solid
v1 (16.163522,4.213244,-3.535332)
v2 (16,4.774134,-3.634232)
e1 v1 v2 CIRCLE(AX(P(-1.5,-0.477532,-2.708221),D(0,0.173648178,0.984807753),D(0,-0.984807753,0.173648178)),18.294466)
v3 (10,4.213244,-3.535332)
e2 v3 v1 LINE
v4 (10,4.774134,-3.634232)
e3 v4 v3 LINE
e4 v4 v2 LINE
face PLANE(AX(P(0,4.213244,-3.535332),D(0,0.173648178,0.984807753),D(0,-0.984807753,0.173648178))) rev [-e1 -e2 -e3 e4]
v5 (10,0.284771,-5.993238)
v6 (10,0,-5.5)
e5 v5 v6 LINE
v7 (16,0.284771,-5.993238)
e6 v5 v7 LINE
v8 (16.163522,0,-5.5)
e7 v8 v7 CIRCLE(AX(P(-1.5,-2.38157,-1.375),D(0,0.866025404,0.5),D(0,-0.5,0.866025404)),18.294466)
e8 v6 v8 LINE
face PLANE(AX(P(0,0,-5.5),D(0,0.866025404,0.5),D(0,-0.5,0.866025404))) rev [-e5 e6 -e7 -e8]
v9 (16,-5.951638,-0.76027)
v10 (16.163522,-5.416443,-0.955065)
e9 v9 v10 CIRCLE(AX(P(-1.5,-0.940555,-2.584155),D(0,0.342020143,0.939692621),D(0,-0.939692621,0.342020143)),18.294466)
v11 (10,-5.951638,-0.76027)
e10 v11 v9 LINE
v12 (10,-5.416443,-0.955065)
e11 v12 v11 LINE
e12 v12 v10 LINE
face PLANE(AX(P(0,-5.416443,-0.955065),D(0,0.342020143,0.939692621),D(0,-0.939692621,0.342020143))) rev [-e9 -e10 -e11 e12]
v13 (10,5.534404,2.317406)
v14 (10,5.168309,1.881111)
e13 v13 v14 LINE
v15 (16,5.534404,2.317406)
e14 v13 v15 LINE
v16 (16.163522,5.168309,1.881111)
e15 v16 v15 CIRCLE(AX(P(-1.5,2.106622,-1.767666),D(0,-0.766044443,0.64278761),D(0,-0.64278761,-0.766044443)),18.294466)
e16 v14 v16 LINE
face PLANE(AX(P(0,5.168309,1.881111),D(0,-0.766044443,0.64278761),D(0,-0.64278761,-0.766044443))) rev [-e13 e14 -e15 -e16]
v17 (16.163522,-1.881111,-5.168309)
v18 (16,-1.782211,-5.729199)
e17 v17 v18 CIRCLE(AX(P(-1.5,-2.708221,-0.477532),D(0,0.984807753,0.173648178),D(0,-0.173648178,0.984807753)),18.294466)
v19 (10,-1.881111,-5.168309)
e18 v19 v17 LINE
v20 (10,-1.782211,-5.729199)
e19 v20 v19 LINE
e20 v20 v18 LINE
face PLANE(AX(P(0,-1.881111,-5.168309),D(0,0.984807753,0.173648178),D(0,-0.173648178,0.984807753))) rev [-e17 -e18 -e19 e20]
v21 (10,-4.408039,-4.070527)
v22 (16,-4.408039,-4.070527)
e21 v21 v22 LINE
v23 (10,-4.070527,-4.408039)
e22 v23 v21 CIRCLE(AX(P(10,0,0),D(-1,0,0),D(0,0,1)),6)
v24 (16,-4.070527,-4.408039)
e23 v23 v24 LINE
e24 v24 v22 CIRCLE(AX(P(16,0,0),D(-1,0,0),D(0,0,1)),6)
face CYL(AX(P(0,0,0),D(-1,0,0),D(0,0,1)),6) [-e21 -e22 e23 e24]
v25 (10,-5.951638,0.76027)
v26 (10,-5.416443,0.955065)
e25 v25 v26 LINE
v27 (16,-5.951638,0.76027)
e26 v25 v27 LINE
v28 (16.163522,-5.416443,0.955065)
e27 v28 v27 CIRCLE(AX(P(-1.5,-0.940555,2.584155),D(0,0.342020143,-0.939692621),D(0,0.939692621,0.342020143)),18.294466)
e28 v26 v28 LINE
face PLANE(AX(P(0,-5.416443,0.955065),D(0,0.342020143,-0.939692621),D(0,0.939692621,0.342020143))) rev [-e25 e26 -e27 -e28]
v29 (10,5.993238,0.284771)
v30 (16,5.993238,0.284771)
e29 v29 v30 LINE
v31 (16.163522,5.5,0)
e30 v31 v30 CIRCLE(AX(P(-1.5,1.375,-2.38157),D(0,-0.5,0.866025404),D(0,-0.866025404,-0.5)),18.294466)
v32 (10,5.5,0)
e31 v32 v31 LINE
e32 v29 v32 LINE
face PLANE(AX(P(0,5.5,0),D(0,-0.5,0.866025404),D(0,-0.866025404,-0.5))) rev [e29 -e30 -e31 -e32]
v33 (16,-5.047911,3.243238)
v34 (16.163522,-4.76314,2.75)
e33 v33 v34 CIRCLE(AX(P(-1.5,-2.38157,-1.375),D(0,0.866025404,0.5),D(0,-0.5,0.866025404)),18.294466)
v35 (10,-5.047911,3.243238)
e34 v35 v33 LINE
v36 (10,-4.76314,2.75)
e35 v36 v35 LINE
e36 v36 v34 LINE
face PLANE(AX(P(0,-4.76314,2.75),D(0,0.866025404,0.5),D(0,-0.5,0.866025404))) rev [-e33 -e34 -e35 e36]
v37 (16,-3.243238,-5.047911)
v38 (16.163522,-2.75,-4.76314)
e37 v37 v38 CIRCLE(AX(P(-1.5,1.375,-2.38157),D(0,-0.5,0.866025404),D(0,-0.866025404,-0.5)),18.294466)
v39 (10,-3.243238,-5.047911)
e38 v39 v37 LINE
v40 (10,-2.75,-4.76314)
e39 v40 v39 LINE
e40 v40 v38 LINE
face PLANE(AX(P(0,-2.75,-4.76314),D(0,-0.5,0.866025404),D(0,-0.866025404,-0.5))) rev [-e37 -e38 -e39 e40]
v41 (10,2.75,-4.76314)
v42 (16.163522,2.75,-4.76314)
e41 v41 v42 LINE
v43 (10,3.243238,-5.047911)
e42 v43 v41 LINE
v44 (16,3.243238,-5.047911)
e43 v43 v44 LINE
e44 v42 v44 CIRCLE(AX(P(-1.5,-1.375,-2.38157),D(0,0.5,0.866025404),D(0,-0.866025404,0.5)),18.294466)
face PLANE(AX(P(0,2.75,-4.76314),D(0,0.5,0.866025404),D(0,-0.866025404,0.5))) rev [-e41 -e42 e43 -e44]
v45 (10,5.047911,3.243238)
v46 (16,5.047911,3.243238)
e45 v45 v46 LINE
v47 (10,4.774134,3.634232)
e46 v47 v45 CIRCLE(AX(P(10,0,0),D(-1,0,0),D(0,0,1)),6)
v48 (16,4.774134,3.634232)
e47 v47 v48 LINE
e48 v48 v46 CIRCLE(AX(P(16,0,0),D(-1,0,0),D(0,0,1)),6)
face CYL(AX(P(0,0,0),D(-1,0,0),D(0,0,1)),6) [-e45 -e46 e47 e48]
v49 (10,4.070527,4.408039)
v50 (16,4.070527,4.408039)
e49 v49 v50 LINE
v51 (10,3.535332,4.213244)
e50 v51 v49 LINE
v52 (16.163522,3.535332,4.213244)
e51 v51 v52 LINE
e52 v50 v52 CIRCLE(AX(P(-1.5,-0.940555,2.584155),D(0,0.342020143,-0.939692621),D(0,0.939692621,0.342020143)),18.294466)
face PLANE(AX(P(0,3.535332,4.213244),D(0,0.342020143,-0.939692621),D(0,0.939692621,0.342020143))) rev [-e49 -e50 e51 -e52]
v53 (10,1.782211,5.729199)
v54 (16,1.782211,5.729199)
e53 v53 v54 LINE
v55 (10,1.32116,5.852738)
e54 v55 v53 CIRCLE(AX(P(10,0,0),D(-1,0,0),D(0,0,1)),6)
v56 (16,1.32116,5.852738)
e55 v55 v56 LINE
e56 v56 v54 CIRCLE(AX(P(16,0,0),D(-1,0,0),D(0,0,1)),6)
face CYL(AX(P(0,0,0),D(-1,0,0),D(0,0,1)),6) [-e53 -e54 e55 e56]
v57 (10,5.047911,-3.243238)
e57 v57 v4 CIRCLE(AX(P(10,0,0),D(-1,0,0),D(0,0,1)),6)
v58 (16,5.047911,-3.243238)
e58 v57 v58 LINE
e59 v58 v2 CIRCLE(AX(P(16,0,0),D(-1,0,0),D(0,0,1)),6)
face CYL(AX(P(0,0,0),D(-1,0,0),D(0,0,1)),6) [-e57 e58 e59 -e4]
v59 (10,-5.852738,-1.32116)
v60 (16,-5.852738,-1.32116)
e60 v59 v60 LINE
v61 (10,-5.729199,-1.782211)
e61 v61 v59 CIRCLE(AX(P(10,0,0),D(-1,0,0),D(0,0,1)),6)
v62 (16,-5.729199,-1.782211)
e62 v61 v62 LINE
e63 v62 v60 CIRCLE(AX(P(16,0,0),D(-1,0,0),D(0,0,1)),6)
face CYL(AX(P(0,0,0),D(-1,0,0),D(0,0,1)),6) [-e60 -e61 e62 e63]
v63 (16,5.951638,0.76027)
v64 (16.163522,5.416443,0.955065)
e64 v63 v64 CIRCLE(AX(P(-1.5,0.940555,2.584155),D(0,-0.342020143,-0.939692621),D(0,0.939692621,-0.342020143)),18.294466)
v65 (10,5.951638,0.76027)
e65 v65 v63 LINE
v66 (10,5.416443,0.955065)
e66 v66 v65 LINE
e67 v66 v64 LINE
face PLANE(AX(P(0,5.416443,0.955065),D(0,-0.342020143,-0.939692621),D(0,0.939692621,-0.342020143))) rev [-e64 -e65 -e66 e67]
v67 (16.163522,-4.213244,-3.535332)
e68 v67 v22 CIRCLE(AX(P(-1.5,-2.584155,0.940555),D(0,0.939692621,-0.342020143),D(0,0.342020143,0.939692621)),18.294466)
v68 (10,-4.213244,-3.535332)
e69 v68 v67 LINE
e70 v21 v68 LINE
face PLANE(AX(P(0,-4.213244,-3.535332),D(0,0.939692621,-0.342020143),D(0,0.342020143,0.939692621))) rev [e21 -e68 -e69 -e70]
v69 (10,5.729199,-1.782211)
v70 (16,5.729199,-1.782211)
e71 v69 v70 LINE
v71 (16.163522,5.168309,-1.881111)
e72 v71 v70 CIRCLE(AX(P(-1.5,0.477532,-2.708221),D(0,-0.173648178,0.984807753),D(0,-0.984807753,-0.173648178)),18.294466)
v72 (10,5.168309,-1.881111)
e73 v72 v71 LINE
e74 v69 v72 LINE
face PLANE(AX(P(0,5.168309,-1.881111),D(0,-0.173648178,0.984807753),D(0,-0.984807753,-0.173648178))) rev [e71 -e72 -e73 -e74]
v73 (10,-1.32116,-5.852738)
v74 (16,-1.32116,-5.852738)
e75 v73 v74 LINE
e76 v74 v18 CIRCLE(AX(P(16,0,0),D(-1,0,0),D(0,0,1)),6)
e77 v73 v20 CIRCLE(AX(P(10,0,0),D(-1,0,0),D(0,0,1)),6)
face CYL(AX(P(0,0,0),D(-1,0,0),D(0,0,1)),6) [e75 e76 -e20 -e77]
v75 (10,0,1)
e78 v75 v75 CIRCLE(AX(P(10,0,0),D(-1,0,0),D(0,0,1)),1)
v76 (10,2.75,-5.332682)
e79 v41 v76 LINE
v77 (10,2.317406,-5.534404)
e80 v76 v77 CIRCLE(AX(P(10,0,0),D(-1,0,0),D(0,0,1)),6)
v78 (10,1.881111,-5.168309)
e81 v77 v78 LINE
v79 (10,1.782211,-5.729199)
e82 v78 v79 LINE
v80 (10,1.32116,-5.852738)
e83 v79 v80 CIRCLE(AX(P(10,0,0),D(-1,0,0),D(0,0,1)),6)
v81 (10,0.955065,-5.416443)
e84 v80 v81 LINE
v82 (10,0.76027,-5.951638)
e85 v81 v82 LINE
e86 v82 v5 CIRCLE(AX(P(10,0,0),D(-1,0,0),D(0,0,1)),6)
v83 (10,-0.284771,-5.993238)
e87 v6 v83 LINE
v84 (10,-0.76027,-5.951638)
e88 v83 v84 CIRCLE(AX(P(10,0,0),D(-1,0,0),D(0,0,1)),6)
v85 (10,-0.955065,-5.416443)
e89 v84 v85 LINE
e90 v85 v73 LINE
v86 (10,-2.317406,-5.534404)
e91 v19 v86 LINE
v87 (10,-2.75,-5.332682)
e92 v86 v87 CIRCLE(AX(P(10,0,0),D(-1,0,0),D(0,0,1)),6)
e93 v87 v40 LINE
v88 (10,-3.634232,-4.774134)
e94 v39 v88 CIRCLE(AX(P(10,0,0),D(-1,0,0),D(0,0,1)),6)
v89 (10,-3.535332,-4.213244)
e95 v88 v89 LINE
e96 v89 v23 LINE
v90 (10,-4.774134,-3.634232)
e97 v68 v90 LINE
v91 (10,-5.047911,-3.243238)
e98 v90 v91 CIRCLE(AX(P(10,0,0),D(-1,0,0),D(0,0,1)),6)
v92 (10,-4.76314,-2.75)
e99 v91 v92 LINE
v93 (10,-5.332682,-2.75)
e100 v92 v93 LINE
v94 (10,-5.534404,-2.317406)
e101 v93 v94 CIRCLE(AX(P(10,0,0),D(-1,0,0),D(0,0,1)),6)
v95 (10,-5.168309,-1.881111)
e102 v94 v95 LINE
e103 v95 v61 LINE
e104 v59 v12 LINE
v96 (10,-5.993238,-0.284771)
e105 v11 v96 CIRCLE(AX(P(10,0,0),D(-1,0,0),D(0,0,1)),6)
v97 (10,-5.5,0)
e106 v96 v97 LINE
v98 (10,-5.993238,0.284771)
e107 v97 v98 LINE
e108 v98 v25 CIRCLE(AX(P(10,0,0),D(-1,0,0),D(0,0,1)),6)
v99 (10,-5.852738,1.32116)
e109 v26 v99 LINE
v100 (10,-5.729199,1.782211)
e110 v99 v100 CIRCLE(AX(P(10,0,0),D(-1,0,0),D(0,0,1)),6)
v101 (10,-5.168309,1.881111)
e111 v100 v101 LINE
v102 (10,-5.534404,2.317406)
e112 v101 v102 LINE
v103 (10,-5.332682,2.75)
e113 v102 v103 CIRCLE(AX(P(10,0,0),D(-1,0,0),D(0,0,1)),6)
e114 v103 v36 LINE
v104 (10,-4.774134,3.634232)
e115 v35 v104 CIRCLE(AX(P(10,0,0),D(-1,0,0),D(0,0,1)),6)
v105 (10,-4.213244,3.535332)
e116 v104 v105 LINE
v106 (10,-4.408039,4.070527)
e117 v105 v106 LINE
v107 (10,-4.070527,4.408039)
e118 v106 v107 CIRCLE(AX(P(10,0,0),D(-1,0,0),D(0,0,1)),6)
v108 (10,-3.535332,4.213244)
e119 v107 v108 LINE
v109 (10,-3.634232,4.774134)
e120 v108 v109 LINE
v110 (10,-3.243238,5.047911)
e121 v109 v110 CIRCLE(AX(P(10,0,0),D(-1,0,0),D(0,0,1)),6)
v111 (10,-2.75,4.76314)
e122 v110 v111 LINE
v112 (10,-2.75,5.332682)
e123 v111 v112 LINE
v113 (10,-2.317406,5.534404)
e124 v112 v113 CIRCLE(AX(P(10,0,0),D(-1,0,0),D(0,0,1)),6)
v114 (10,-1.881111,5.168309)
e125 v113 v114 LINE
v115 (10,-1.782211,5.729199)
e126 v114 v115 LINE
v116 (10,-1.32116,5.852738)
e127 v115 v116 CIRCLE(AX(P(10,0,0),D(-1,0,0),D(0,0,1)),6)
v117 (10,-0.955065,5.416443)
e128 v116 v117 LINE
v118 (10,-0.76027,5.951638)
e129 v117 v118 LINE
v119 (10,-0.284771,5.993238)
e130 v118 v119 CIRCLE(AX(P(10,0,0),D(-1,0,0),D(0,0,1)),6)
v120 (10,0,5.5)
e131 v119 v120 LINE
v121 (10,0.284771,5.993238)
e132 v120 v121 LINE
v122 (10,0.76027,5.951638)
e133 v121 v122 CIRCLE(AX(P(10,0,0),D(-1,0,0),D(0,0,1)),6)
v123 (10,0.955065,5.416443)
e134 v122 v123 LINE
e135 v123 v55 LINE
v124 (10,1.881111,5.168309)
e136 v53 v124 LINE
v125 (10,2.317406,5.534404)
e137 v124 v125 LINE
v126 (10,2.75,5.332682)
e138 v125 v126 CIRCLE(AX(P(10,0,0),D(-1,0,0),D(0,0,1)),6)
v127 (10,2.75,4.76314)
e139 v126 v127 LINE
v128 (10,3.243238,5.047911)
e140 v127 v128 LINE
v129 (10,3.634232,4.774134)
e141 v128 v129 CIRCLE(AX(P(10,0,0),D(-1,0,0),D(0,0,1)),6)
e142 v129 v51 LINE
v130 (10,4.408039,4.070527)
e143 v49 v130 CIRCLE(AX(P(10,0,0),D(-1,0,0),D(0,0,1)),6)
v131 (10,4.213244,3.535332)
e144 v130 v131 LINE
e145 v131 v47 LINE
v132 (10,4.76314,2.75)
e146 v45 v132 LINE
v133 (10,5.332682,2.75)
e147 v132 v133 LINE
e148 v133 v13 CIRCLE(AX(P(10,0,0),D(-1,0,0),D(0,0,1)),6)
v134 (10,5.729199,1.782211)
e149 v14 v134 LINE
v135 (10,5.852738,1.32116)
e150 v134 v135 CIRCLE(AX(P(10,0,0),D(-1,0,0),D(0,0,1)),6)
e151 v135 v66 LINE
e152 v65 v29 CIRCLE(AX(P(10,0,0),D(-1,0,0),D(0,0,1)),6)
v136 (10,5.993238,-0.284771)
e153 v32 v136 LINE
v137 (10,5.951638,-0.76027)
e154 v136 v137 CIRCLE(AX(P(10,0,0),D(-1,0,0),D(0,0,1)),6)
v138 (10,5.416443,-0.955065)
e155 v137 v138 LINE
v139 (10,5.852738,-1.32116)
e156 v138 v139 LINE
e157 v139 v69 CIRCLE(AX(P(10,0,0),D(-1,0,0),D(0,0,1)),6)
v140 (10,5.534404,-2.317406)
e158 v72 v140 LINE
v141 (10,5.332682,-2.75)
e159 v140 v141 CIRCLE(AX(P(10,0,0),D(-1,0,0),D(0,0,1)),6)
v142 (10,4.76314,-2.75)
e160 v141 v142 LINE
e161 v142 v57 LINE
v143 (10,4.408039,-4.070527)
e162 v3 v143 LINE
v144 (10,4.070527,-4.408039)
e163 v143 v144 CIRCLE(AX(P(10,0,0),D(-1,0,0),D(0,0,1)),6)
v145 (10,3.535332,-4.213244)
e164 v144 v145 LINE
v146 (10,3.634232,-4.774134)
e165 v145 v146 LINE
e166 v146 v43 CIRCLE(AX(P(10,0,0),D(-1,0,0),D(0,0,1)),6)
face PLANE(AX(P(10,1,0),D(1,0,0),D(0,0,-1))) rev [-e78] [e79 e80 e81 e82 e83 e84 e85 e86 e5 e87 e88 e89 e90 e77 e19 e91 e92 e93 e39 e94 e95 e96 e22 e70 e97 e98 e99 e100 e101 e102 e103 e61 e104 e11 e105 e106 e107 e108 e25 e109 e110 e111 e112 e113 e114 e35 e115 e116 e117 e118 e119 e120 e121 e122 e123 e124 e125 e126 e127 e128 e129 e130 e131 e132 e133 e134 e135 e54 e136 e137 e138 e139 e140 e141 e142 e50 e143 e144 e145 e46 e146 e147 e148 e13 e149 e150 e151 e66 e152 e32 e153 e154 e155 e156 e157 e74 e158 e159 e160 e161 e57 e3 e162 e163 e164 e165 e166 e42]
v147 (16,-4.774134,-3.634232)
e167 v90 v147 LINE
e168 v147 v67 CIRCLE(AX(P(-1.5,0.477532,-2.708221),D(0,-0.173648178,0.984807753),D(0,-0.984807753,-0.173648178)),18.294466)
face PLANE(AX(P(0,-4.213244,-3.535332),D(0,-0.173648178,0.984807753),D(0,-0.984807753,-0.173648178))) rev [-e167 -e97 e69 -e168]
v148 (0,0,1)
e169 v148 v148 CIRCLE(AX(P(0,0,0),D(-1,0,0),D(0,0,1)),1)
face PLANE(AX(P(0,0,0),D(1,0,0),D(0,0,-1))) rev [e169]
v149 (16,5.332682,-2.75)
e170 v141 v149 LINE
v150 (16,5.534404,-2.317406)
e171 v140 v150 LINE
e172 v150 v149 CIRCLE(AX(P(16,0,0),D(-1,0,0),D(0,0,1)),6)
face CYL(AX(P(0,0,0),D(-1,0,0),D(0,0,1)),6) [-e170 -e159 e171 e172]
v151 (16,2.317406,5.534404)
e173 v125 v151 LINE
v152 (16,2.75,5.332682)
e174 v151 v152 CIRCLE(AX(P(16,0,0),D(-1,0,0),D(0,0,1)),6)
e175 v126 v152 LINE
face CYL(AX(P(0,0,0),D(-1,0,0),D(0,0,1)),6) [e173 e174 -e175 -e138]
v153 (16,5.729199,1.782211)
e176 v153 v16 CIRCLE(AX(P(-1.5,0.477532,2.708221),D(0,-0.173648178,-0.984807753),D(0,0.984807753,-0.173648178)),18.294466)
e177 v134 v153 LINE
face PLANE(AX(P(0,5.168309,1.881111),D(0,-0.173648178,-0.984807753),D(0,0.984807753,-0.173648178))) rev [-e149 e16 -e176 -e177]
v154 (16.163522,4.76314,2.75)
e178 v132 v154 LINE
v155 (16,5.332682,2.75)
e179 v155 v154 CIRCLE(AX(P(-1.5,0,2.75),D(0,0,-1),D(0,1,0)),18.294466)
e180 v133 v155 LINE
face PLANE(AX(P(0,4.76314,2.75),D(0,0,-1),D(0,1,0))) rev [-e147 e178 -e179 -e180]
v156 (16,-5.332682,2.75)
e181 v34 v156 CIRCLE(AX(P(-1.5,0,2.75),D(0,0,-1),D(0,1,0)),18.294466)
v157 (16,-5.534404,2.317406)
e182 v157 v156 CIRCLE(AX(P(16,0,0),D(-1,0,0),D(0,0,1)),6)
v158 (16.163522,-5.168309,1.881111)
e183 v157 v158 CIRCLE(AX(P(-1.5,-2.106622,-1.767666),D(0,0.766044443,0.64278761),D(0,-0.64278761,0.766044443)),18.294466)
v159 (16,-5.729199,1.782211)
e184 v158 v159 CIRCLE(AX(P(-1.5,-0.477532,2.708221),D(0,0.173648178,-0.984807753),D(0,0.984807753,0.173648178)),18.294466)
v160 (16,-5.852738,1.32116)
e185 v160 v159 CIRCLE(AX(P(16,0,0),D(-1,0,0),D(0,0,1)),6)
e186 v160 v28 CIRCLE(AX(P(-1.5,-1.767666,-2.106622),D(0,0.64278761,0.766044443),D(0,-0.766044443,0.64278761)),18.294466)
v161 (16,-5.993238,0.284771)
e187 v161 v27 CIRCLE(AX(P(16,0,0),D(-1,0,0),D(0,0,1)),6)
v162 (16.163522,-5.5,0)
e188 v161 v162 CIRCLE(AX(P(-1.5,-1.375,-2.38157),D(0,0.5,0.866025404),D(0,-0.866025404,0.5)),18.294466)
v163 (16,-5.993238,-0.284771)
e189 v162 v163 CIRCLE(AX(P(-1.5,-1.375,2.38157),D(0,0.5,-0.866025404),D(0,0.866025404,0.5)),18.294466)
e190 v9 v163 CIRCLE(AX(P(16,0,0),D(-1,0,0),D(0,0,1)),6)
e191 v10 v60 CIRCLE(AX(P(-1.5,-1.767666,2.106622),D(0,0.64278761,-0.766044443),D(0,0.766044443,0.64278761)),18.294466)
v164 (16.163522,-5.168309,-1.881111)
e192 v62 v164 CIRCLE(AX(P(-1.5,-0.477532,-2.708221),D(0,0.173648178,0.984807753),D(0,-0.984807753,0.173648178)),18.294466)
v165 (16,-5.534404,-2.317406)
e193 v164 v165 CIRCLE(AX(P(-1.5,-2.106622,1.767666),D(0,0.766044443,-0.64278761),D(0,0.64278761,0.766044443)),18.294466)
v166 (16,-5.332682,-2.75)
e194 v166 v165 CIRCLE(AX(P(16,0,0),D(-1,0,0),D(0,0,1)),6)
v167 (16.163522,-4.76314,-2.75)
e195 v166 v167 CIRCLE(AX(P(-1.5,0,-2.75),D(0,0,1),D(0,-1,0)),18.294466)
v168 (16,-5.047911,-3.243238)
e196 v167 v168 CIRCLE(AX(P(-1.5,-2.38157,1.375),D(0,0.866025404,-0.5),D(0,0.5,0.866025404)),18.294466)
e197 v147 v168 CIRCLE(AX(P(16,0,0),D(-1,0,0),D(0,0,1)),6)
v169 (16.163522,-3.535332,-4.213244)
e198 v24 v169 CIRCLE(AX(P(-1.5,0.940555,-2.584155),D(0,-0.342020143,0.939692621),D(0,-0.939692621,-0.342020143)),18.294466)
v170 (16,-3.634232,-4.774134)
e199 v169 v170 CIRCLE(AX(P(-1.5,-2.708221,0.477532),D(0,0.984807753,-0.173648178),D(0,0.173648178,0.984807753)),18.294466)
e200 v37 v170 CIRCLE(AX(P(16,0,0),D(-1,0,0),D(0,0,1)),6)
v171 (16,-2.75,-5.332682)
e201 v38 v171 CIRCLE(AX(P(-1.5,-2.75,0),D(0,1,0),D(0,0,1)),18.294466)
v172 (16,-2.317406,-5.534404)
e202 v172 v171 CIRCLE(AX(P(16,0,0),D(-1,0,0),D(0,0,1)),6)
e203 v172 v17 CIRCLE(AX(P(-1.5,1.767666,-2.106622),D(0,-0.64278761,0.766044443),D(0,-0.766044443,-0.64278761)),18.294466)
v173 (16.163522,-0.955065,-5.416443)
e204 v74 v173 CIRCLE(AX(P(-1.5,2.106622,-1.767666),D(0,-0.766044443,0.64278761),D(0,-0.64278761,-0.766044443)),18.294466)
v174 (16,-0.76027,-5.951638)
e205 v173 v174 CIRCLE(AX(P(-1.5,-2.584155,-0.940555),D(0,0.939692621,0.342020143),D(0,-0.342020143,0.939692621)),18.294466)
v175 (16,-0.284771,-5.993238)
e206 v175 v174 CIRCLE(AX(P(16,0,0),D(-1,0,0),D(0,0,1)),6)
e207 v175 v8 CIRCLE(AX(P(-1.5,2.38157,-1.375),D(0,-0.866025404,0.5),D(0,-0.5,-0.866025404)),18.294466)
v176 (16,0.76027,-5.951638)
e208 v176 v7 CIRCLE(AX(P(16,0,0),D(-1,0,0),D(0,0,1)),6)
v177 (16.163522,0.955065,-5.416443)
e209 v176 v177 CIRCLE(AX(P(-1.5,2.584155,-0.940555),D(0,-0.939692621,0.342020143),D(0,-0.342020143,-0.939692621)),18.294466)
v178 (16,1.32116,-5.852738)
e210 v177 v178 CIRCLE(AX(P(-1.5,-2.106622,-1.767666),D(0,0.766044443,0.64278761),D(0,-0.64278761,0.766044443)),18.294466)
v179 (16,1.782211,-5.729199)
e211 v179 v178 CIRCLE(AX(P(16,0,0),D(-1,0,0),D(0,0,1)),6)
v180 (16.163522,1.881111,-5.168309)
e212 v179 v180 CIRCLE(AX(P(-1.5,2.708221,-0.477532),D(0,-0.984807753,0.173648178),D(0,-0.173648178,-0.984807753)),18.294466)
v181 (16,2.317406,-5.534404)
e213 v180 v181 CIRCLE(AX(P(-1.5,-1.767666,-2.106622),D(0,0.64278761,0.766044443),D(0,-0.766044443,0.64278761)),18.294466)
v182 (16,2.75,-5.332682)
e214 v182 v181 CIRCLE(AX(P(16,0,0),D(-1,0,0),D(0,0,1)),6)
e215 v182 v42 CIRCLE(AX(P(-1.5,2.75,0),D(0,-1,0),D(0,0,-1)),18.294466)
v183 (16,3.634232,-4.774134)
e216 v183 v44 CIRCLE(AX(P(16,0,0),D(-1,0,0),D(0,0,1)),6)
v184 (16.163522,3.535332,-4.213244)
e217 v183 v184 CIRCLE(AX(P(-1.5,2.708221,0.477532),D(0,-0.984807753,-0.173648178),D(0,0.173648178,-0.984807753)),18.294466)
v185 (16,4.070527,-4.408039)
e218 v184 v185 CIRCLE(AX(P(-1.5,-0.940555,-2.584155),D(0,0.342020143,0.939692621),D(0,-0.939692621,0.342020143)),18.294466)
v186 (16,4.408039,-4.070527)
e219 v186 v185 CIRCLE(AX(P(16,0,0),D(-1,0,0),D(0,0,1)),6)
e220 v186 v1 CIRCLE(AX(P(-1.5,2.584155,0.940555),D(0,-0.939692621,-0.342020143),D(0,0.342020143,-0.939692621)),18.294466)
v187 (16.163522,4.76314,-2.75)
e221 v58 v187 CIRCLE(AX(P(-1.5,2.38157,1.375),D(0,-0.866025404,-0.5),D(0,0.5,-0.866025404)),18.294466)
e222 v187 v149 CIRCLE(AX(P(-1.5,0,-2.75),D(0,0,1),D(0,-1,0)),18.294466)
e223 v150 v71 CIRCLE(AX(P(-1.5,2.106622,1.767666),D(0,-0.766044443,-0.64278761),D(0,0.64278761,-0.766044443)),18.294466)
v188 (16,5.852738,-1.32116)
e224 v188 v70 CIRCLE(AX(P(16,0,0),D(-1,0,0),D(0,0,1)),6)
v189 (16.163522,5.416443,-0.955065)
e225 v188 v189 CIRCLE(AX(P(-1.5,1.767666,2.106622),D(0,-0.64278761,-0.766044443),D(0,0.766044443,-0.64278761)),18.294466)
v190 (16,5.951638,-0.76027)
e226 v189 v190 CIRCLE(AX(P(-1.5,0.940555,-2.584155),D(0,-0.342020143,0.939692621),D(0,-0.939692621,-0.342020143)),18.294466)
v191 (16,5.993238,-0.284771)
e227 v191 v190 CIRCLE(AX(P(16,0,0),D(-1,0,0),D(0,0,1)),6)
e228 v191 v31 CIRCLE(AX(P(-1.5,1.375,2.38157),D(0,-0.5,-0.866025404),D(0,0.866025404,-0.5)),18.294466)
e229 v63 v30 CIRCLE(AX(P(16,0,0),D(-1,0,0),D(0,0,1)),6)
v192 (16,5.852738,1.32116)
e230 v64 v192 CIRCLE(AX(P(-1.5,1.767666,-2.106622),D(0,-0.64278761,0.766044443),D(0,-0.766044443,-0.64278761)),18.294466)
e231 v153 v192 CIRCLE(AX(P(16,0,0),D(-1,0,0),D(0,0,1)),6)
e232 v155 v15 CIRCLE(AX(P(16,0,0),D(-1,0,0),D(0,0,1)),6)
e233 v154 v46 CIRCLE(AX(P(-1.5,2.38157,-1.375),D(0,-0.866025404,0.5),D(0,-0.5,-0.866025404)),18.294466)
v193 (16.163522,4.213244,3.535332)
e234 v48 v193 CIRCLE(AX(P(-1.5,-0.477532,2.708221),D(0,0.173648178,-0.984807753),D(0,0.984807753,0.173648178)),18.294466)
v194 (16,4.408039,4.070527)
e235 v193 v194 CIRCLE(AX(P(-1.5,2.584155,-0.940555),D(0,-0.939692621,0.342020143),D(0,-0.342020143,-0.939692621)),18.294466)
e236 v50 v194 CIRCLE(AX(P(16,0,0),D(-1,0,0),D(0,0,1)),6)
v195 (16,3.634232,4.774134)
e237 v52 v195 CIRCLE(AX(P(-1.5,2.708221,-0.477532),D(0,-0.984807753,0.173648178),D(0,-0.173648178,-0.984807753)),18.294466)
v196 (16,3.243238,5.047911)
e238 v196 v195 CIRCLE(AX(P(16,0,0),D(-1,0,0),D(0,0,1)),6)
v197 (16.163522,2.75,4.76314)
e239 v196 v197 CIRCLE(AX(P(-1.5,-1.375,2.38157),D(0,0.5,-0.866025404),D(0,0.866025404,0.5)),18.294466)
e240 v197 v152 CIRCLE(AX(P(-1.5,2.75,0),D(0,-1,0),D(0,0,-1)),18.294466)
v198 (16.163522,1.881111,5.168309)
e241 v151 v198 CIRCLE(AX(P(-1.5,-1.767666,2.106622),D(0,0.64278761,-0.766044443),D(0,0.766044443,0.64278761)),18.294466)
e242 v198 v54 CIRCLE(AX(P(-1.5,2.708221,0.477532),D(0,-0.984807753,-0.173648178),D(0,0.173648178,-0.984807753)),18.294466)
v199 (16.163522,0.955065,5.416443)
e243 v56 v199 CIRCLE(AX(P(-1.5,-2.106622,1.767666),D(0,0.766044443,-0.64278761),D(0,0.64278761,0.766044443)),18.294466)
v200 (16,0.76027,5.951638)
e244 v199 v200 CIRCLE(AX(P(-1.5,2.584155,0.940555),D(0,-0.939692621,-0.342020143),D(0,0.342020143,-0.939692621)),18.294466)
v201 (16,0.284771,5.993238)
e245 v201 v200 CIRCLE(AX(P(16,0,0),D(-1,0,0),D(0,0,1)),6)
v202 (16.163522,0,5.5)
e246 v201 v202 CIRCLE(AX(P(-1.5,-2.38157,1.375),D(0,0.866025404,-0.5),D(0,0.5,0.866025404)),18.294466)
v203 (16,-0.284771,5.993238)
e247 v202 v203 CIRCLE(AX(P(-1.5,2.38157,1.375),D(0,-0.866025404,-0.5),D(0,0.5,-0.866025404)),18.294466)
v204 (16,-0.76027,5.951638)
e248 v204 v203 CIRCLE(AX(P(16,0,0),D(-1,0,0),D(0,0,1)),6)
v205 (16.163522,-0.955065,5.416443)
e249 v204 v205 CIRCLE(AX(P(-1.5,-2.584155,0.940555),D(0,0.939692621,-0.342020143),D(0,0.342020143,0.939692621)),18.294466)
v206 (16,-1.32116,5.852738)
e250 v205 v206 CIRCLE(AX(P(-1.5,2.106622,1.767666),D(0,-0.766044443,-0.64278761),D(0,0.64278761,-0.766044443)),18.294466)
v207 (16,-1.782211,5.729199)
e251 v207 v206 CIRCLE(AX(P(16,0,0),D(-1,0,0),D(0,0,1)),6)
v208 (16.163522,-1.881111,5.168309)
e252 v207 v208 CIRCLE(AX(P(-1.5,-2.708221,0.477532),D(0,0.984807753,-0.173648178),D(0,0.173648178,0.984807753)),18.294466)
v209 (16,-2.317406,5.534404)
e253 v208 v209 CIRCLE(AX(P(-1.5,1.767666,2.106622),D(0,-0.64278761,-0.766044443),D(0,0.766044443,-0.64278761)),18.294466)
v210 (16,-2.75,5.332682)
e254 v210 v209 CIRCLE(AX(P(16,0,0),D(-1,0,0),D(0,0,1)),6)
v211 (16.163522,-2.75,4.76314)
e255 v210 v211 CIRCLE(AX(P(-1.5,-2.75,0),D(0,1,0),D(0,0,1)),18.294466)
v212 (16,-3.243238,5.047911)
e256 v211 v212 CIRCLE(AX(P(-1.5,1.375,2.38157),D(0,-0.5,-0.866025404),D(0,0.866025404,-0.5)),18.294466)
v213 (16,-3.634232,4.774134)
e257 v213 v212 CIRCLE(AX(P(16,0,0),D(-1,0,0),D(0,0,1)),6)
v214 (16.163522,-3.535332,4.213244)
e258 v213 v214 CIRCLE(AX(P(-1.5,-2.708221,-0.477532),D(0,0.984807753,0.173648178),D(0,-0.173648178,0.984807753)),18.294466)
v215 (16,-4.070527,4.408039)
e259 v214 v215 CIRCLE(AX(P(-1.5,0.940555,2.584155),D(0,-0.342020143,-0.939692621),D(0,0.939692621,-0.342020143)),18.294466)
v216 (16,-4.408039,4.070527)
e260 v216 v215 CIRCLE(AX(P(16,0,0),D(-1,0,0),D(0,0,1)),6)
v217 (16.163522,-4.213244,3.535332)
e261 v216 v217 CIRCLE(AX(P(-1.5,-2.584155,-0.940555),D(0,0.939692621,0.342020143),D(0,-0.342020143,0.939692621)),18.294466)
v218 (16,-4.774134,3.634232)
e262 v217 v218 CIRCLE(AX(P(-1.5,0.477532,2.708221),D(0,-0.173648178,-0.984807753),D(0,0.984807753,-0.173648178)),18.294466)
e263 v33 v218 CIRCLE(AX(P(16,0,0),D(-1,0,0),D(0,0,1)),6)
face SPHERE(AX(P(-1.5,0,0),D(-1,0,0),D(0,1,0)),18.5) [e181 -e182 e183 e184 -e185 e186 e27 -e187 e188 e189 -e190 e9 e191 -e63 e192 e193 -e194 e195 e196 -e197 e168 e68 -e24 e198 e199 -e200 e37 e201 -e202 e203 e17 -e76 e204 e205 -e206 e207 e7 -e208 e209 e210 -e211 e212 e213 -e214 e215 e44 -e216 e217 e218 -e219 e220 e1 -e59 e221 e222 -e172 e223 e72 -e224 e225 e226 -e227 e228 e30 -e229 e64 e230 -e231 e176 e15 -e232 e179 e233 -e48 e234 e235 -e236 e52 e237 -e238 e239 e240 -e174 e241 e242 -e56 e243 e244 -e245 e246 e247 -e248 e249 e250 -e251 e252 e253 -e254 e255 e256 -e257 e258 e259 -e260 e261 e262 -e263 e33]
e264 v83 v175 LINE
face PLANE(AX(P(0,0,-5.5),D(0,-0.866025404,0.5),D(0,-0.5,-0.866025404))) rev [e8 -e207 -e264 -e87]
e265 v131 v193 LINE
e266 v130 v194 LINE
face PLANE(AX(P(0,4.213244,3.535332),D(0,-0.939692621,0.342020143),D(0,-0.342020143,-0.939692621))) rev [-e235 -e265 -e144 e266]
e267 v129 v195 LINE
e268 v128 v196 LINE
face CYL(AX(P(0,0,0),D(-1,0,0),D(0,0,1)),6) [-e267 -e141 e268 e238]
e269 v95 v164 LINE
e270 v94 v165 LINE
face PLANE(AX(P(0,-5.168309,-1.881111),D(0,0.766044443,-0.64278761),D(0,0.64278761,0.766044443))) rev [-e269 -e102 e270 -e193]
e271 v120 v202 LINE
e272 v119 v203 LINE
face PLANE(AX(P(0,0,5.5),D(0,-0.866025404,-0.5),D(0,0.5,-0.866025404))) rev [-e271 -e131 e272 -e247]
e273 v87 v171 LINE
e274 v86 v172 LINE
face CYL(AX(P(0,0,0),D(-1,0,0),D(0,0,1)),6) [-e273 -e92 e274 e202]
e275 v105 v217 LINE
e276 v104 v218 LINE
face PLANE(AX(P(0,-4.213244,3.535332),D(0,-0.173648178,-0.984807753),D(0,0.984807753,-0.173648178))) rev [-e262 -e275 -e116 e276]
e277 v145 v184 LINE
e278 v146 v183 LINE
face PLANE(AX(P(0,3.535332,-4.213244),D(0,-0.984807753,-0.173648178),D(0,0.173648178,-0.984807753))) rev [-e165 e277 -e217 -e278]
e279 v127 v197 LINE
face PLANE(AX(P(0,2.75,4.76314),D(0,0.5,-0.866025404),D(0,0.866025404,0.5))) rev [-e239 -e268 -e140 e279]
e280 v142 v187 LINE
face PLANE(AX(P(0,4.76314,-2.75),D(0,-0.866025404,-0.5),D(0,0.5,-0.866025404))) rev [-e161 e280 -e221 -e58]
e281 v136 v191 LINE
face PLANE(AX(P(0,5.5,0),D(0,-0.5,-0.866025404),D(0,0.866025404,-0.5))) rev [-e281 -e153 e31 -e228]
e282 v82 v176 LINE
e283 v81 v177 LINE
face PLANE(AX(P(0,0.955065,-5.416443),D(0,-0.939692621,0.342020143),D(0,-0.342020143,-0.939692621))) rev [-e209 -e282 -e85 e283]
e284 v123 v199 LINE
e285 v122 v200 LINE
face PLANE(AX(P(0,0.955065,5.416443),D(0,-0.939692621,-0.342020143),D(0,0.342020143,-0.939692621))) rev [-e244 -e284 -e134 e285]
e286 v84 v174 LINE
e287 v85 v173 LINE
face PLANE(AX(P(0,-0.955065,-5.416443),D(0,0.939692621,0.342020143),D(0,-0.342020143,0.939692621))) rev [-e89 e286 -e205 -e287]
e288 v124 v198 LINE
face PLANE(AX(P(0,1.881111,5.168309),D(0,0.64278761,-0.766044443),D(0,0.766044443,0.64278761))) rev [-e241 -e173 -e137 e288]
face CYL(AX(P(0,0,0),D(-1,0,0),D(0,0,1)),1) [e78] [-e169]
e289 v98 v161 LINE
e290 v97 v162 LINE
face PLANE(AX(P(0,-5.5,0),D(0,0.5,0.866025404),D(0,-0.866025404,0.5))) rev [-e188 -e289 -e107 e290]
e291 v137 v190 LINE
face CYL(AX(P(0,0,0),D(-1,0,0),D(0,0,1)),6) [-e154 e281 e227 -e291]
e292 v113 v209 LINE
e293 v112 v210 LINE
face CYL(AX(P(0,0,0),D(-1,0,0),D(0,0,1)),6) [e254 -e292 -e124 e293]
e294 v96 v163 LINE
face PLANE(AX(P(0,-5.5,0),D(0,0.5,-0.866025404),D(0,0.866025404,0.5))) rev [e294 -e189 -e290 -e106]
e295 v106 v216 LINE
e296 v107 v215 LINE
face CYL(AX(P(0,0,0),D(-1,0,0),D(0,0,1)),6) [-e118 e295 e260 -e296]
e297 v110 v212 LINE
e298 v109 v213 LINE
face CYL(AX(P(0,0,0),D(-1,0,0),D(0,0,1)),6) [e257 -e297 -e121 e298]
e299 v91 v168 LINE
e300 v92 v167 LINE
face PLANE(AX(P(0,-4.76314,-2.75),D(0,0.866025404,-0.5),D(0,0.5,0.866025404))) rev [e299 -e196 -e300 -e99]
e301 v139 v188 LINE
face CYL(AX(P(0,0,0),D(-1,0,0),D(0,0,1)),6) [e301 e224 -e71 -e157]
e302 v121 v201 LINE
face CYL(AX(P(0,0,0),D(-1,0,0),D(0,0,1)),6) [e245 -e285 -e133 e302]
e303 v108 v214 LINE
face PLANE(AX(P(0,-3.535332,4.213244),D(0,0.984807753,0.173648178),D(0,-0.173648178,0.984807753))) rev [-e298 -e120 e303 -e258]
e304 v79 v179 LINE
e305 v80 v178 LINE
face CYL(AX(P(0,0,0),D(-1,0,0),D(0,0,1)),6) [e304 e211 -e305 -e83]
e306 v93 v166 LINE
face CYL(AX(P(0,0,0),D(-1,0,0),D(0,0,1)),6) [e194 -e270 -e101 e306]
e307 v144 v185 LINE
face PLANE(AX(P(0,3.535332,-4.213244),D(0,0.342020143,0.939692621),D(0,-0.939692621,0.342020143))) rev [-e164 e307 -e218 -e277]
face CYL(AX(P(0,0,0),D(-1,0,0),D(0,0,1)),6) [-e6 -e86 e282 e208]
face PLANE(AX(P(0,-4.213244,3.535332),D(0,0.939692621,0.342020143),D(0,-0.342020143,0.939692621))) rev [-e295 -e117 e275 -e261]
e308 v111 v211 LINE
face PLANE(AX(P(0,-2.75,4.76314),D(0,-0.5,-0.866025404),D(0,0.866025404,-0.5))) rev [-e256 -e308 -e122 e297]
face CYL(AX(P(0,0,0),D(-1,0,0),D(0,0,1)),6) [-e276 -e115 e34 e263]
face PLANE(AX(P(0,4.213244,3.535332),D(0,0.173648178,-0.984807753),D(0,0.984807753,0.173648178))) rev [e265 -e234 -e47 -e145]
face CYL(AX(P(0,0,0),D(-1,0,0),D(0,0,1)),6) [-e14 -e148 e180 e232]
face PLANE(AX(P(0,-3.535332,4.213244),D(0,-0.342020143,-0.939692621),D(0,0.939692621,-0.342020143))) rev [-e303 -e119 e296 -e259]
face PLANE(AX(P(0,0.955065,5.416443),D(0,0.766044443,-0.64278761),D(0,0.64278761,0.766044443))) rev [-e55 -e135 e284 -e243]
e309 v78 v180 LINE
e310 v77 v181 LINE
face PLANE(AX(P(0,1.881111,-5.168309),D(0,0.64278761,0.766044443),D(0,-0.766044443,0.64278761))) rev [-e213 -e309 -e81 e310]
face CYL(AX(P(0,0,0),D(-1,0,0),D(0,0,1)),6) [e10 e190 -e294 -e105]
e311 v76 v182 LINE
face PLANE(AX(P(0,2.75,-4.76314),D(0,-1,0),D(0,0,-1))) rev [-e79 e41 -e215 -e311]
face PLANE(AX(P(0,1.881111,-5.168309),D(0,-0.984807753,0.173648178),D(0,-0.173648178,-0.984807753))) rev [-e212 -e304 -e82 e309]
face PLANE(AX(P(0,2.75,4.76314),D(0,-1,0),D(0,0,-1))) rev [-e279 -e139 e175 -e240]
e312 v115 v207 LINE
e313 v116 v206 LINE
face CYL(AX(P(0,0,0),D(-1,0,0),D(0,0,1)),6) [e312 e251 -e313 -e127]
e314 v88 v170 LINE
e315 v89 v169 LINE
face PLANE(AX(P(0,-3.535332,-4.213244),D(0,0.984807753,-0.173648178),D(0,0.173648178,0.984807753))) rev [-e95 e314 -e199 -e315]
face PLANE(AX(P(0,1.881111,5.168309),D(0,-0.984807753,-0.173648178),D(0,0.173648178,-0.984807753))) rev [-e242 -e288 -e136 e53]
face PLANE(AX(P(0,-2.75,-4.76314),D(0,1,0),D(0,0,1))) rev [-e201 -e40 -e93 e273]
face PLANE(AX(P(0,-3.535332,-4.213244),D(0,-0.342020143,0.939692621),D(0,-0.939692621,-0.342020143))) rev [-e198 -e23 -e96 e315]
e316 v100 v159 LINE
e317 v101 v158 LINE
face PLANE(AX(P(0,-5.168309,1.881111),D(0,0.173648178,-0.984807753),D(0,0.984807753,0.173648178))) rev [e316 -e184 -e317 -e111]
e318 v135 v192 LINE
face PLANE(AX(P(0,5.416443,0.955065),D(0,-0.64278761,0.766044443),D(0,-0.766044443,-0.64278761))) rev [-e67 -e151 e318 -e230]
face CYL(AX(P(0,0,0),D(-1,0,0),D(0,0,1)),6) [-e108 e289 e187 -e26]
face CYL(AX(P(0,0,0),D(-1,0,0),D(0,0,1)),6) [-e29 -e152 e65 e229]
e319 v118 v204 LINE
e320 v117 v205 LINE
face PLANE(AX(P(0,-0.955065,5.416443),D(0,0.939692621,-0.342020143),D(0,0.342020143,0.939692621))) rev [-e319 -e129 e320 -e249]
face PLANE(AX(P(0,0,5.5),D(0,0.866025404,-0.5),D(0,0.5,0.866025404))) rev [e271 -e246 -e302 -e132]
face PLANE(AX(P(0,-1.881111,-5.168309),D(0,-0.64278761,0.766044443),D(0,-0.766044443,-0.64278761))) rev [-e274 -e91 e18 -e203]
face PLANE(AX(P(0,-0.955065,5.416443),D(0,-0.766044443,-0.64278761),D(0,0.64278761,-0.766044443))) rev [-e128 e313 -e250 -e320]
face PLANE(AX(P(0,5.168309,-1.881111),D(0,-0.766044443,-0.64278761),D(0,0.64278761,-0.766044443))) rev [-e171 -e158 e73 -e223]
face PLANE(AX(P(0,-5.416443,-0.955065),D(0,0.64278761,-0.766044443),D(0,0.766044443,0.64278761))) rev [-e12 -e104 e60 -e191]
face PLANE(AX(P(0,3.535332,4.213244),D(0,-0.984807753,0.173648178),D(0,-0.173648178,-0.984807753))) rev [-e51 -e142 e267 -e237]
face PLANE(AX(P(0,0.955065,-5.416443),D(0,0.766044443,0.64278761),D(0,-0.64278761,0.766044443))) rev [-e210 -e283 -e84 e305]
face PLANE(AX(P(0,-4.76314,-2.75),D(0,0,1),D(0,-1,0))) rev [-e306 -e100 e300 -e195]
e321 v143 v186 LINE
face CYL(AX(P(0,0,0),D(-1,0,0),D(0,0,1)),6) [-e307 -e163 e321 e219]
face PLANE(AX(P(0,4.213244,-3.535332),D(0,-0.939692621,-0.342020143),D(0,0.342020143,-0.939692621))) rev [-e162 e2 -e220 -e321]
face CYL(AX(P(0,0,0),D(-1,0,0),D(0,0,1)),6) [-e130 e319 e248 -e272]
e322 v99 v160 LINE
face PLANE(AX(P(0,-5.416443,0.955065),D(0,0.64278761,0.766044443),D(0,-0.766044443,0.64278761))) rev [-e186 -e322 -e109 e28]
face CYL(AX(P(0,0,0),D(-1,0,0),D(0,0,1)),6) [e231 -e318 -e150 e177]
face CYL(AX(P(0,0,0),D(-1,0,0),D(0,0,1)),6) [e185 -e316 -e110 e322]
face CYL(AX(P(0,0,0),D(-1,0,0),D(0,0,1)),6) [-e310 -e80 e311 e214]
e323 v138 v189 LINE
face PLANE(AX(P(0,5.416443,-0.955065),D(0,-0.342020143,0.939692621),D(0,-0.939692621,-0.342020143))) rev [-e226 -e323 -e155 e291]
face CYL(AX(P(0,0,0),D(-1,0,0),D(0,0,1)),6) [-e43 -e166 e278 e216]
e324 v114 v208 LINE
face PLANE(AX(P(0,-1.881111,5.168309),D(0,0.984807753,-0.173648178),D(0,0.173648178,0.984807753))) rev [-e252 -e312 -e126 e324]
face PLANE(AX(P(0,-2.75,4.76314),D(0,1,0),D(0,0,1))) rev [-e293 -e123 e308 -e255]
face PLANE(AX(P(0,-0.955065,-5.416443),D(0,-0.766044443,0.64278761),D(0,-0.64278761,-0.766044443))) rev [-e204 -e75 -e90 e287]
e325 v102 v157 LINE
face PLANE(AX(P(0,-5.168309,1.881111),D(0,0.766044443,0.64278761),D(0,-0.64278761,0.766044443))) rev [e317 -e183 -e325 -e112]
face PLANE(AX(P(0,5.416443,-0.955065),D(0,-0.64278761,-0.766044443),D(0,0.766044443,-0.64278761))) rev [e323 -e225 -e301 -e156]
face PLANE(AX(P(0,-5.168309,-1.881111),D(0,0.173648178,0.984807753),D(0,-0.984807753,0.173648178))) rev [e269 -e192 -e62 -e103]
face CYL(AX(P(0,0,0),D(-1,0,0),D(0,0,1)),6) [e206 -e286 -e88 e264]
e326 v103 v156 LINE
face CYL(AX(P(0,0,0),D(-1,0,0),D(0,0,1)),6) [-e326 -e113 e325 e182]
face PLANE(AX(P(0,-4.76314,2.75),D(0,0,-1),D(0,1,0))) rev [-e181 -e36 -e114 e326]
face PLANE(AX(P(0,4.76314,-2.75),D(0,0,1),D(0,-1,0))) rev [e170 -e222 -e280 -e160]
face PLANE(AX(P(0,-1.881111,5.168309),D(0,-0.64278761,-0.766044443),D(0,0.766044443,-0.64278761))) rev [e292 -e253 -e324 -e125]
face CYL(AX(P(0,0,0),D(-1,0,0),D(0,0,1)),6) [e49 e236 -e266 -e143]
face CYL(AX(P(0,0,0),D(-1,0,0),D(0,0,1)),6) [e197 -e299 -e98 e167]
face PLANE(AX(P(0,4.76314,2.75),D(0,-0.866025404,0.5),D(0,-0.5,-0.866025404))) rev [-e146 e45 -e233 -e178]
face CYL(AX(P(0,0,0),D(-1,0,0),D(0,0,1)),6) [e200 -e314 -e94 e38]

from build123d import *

# Parameters (mm, degrees)
CUT_EXTRUDE1_DEPTH = 22.725560982
CIRPATTERN1_START  = 10
CIRPATTERN1_DEPTH  = 6.163521733


# Read off the part's stored shape, not the designer's step: CirPattern1
with BuildPart() as part:
    # Sketch2 → Revolve1 (revolve)
    with BuildSketch(Plane.XY, mode=Mode.PRIVATE) as revolve1_sk:
        with BuildLine():
            Line((0, 0), (0, 1))
            Line((0, 1), (10, 1))
            Line((10, 1), (10, 6))
            Line((10, 6), (16, 6))
            ThreePointArc((16, 6), (16.748287591, 3.041381265), (17, 0))
            Line((17, 0), (0, 0))
        make_face()
    revolve(revolve1_sk.sketch.rotate(Axis((0, 0, 0), (1, 0, 0)), 90), axis=Axis((0, 0, 0), (1, 0, 0)))

    # Sketch3 → Cut-Extrude1 (cut, through all)
    with BuildSketch(Plane(origin=(20, 0, 0), x_dir=(0, 0, -1), z_dir=(1, 0, 0))):
        with BuildLine():
            Line((0, 5.5), (-0.284771266, 5.9932383))
            ThreePointArc((-0.284771266, 5.9932383), (0, 6), (0.284771266, 5.9932383))
            Line((0.284771266, 5.9932383), (0, 5.5))
        make_face()
    extrude(amount=-CUT_EXTRUDE1_DEPTH, mode=Mode.SUBTRACT)

    # CirPattern1 outline → CirPattern1 (cut)
    with BuildSketch(Plane.YZ.offset(CIRPATTERN1_START)):
        with BuildLine():
            ThreePointArc((-2.75, 5.332682252), (-3, 5.196152423), (-3.2432383, 5.047910986))
            Line((-3.2432383, 5.047910986), (-2.75, 4.763139721))
            Line((-2.75, 4.763139721), (-2.75, 5.332682252))
        make_face()
        with BuildLine():
            Line((5.416442642, -0.955064977), (5.852737532, -1.321159859))
            ThreePointArc((5.852737532, -1.321159859), (5.908846518, -1.041889066), (5.951637555, -0.760269959))
            Line((5.951637555, -0.760269959), (5.416442642, -0.955064977))
        make_face()
        with BuildLine():
            Line((5.168309414, -1.881110788), (5.534404296, -2.317405679))
            ThreePointArc((5.534404296, -2.317405679), (5.638155724, -2.05212086), (5.729199314, -1.782210766))
            Line((5.729199314, -1.782210766), (5.168309414, -1.881110788))
        make_face()
        with BuildLine():
            Line((4.763139721, -2.75), (5.047910986, -3.2432383))
            ThreePointArc((5.047910986, -3.2432383), (5.196152422, -3), (5.332682252, -2.75))
            Line((5.332682252, -2.75), (4.763139721, -2.75))
        make_face()
        with BuildLine():
            Line((4.213244437, -3.535331853), (4.408039455, -4.070526767))
            ThreePointArc((4.408039455, -4.070526767), (4.596266658, -3.856725658), (4.774134337, -3.634231876))
            Line((4.774134337, -3.634231876), (4.213244437, -3.535331853))
        make_face()
        with BuildLine():
            Line((3.535331853, -4.213244437), (3.634231876, -4.774134337))
            ThreePointArc((3.634231876, -4.774134337), (3.856725658, -4.596266658), (4.070526767, -4.408039455))
            Line((4.070526767, -4.408039455), (3.535331853, -4.213244437))
        make_face()
        with BuildLine():
            Line((2.75, -4.763139721), (2.75, -5.332682252))
            ThreePointArc((2.75, -5.332682252), (3, -5.196152422), (3.2432383, -5.047910986))
            Line((3.2432383, -5.047910986), (2.75, -4.763139721))
        make_face()
        with BuildLine():
            Line((1.881110788, -5.168309414), (1.782210766, -5.729199314))
            ThreePointArc((1.782210766, -5.729199314), (2.05212086, -5.638155724), (2.317405679, -5.534404296))
            Line((2.317405679, -5.534404296), (1.881110788, -5.168309414))
        make_face()
        with BuildLine():
            Line((0.955064977, -5.416442642), (0.760269959, -5.951637555))
            ThreePointArc((0.760269959, -5.951637555), (1.041889066, -5.908846518), (1.321159859, -5.852737532))
            Line((1.321159859, -5.852737532), (0.955064977, -5.416442642))
        make_face()
        with BuildLine():
            Line((0, -5.5), (-0.284771266, -5.9932383))
            ThreePointArc((-0.284771266, -5.9932383), (0, -6), (0.284771266, -5.9932383))
            Line((0.284771266, -5.9932383), (0, -5.5))
        make_face()
        with BuildLine():
            Line((-0.955064977, -5.416442642), (-1.321159859, -5.852737533))
            ThreePointArc((-1.321159859, -5.852737533), (-1.041889066, -5.908846518), (-0.760269959, -5.951637555))
            Line((-0.760269959, -5.951637555), (-0.955064977, -5.416442642))
        make_face()
        with BuildLine():
            Line((-1.881110788, -5.168309414), (-2.317405679, -5.534404297))
            ThreePointArc((-2.317405679, -5.534404297), (-2.05212086, -5.638155725), (-1.782210766, -5.729199314))
            Line((-1.782210766, -5.729199314), (-1.881110788, -5.168309414))
        make_face()
        with BuildLine():
            Line((-2.75, -4.763139721), (-3.2432383, -5.047910986))
            ThreePointArc((-3.2432383, -5.047910986), (-3, -5.196152423), (-2.75, -5.332682252))
            Line((-2.75, -5.332682252), (-2.75, -4.763139721))
        make_face()
        with BuildLine():
            Line((-3.535331853, -4.213244437), (-4.070526767, -4.408039455))
            ThreePointArc((-4.070526767, -4.408039455), (-3.856725658, -4.596266658), (-3.634231876, -4.774134337))
            Line((-3.634231876, -4.774134337), (-3.535331853, -4.213244437))
        make_face()
        with BuildLine():
            Line((-4.213244437, -3.535331853), (-4.774134337, -3.634231876))
            ThreePointArc((-4.774134337, -3.634231876), (-4.596266658, -3.856725658), (-4.408039455, -4.070526767))
            Line((-4.408039455, -4.070526767), (-4.213244437, -3.535331853))
        make_face()
        with BuildLine():
            Line((-4.763139721, -2.75), (-5.332682252, -2.75))
            ThreePointArc((-5.332682252, -2.75), (-5.196152423, -3), (-5.047910986, -3.2432383))
            Line((-5.047910986, -3.2432383), (-4.763139721, -2.75))
        make_face()
        with BuildLine():
            Line((-5.168309414, -1.881110788), (-5.729199315, -1.782210766))
            ThreePointArc((-5.729199315, -1.782210766), (-5.638155725, -2.05212086), (-5.534404297, -2.317405679))
            Line((-5.534404297, -2.317405679), (-5.168309414, -1.881110788))
        make_face()
        with BuildLine():
            Line((-5.416442642, -0.955064977), (-5.951637555, -0.760269959))
            ThreePointArc((-5.951637555, -0.760269959), (-5.908846518, -1.041889066), (-5.852737533, -1.321159859))
            Line((-5.852737533, -1.321159859), (-5.416442642, -0.955064977))
        make_face()
        with BuildLine():
            Line((-5.5, 0), (-5.9932383, 0.284771266))
            ThreePointArc((-5.9932383, 0.284771266), (-6, 0), (-5.9932383, -0.284771266))
            Line((-5.9932383, -0.284771266), (-5.5, 0))
        make_face()
        with BuildLine():
            Line((-5.416442642, 0.955064977), (-5.852737533, 1.321159859))
            ThreePointArc((-5.852737533, 1.321159859), (-5.908846518, 1.041889066), (-5.951637555, 0.760269959))
            Line((-5.951637555, 0.760269959), (-5.416442642, 0.955064977))
        make_face()
        with BuildLine():
            Line((-5.168309414, 1.881110788), (-5.534404297, 2.317405679))
            ThreePointArc((-5.534404297, 2.317405679), (-5.638155725, 2.05212086), (-5.729199315, 1.782210766))
            Line((-5.729199315, 1.782210766), (-5.168309414, 1.881110788))
        make_face()
        with BuildLine():
            Line((-4.763139721, 2.75), (-5.047910986, 3.2432383))
            ThreePointArc((-5.047910986, 3.2432383), (-5.196152423, 3), (-5.332682252, 2.75))
            Line((-5.332682252, 2.75), (-4.763139721, 2.75))
        make_face()
        with BuildLine():
            Line((-4.213244437, 3.535331853), (-4.408039455, 4.070526767))
            ThreePointArc((-4.408039455, 4.070526767), (-4.596266658, 3.856725658), (-4.774134337, 3.634231876))
            Line((-4.774134337, 3.634231876), (-4.213244437, 3.535331853))
        make_face()
        with BuildLine():
            Line((-3.535331853, 4.213244437), (-3.634231876, 4.774134337))
            ThreePointArc((-3.634231876, 4.774134337), (-3.856725658, 4.596266658), (-4.070526767, 4.408039455))
            Line((-4.070526767, 4.408039455), (-3.535331853, 4.213244437))
        make_face()
        with BuildLine():
            ThreePointArc((5.951637555, 0.760269959), (5.908846518, 1.041889066), (5.852737532, 1.321159859))
            Line((5.852737532, 1.321159859), (5.416442642, 0.955064977))
            Line((5.416442642, 0.955064977), (5.951637555, 0.760269959))
        make_face()
        with BuildLine():
            ThreePointArc((5.729199314, 1.782210766), (5.638155724, 2.05212086), (5.534404296, 2.317405679))
            Line((5.534404296, 2.317405679), (5.168309414, 1.881110788))
            Line((5.168309414, 1.881110788), (5.729199314, 1.782210766))
        make_face()
        with BuildLine():
            ThreePointArc((5.332682252, 2.75), (5.196152422, 3), (5.047910986, 3.2432383))
            Line((5.047910986, 3.2432383), (4.763139721, 2.75))
            Line((4.763139721, 2.75), (5.332682252, 2.75))
        make_face()
        with BuildLine():
            ThreePointArc((4.774134337, 3.634231876), (4.596266658, 3.856725658), (4.408039455, 4.070526767))
            Line((4.408039455, 4.070526767), (4.213244437, 3.535331853))
            Line((4.213244437, 3.535331853), (4.774134337, 3.634231876))
        make_face()
        with BuildLine():
            ThreePointArc((4.070526767, 4.408039455), (3.856725658, 4.596266658), (3.634231876, 4.774134337))
            Line((3.634231876, 4.774134337), (3.535331853, 4.213244437))
            Line((3.535331853, 4.213244437), (4.070526767, 4.408039455))
        make_face()
        with BuildLine():
            ThreePointArc((3.2432383, 5.047910986), (3, 5.196152422), (2.75, 5.332682252))
            Line((2.75, 5.332682252), (2.75, 4.763139721))
            Line((2.75, 4.763139721), (3.2432383, 5.047910986))
        make_face()
        with BuildLine():
            ThreePointArc((2.317405679, 5.534404296), (2.05212086, 5.638155724), (1.782210766, 5.729199314))
            Line((1.782210766, 5.729199314), (1.881110788, 5.168309414))
            Line((1.881110788, 5.168309414), (2.317405679, 5.534404296))
        make_face()
        with BuildLine():
            ThreePointArc((1.321159859, 5.852737532), (1.041889066, 5.908846518), (0.760269959, 5.951637555))
            Line((0.760269959, 5.951637555), (0.955064977, 5.416442642))
            Line((0.955064977, 5.416442642), (1.321159859, 5.852737532))
        make_face()
        with BuildLine():
            ThreePointArc((0.284771266, 5.9932383), (0, 6), (-0.284771266, 5.9932383))
            Line((-0.284771266, 5.9932383), (0, 5.5))
            Line((0, 5.5), (0.284771266, 5.9932383))
        make_face()
        with BuildLine():
            ThreePointArc((-0.760269959, 5.951637555), (-1.041889066, 5.908846518), (-1.321159859, 5.852737533))
            Line((-1.321159859, 5.852737533), (-0.955064977, 5.416442642))
            Line((-0.955064977, 5.416442642), (-0.760269959, 5.951637555))
        make_face()
        with BuildLine():
            ThreePointArc((-1.782210766, 5.729199314), (-2.05212086, 5.638155725), (-2.317405679, 5.534404297))
            Line((-2.317405679, 5.534404297), (-1.881110788, 5.168309414))
            Line((-1.881110788, 5.168309414), (-1.782210766, 5.729199314))
        make_face()
    extrude(amount=CIRPATTERN1_DEPTH, mode=Mode.SUBTRACT)


solid = part.part
